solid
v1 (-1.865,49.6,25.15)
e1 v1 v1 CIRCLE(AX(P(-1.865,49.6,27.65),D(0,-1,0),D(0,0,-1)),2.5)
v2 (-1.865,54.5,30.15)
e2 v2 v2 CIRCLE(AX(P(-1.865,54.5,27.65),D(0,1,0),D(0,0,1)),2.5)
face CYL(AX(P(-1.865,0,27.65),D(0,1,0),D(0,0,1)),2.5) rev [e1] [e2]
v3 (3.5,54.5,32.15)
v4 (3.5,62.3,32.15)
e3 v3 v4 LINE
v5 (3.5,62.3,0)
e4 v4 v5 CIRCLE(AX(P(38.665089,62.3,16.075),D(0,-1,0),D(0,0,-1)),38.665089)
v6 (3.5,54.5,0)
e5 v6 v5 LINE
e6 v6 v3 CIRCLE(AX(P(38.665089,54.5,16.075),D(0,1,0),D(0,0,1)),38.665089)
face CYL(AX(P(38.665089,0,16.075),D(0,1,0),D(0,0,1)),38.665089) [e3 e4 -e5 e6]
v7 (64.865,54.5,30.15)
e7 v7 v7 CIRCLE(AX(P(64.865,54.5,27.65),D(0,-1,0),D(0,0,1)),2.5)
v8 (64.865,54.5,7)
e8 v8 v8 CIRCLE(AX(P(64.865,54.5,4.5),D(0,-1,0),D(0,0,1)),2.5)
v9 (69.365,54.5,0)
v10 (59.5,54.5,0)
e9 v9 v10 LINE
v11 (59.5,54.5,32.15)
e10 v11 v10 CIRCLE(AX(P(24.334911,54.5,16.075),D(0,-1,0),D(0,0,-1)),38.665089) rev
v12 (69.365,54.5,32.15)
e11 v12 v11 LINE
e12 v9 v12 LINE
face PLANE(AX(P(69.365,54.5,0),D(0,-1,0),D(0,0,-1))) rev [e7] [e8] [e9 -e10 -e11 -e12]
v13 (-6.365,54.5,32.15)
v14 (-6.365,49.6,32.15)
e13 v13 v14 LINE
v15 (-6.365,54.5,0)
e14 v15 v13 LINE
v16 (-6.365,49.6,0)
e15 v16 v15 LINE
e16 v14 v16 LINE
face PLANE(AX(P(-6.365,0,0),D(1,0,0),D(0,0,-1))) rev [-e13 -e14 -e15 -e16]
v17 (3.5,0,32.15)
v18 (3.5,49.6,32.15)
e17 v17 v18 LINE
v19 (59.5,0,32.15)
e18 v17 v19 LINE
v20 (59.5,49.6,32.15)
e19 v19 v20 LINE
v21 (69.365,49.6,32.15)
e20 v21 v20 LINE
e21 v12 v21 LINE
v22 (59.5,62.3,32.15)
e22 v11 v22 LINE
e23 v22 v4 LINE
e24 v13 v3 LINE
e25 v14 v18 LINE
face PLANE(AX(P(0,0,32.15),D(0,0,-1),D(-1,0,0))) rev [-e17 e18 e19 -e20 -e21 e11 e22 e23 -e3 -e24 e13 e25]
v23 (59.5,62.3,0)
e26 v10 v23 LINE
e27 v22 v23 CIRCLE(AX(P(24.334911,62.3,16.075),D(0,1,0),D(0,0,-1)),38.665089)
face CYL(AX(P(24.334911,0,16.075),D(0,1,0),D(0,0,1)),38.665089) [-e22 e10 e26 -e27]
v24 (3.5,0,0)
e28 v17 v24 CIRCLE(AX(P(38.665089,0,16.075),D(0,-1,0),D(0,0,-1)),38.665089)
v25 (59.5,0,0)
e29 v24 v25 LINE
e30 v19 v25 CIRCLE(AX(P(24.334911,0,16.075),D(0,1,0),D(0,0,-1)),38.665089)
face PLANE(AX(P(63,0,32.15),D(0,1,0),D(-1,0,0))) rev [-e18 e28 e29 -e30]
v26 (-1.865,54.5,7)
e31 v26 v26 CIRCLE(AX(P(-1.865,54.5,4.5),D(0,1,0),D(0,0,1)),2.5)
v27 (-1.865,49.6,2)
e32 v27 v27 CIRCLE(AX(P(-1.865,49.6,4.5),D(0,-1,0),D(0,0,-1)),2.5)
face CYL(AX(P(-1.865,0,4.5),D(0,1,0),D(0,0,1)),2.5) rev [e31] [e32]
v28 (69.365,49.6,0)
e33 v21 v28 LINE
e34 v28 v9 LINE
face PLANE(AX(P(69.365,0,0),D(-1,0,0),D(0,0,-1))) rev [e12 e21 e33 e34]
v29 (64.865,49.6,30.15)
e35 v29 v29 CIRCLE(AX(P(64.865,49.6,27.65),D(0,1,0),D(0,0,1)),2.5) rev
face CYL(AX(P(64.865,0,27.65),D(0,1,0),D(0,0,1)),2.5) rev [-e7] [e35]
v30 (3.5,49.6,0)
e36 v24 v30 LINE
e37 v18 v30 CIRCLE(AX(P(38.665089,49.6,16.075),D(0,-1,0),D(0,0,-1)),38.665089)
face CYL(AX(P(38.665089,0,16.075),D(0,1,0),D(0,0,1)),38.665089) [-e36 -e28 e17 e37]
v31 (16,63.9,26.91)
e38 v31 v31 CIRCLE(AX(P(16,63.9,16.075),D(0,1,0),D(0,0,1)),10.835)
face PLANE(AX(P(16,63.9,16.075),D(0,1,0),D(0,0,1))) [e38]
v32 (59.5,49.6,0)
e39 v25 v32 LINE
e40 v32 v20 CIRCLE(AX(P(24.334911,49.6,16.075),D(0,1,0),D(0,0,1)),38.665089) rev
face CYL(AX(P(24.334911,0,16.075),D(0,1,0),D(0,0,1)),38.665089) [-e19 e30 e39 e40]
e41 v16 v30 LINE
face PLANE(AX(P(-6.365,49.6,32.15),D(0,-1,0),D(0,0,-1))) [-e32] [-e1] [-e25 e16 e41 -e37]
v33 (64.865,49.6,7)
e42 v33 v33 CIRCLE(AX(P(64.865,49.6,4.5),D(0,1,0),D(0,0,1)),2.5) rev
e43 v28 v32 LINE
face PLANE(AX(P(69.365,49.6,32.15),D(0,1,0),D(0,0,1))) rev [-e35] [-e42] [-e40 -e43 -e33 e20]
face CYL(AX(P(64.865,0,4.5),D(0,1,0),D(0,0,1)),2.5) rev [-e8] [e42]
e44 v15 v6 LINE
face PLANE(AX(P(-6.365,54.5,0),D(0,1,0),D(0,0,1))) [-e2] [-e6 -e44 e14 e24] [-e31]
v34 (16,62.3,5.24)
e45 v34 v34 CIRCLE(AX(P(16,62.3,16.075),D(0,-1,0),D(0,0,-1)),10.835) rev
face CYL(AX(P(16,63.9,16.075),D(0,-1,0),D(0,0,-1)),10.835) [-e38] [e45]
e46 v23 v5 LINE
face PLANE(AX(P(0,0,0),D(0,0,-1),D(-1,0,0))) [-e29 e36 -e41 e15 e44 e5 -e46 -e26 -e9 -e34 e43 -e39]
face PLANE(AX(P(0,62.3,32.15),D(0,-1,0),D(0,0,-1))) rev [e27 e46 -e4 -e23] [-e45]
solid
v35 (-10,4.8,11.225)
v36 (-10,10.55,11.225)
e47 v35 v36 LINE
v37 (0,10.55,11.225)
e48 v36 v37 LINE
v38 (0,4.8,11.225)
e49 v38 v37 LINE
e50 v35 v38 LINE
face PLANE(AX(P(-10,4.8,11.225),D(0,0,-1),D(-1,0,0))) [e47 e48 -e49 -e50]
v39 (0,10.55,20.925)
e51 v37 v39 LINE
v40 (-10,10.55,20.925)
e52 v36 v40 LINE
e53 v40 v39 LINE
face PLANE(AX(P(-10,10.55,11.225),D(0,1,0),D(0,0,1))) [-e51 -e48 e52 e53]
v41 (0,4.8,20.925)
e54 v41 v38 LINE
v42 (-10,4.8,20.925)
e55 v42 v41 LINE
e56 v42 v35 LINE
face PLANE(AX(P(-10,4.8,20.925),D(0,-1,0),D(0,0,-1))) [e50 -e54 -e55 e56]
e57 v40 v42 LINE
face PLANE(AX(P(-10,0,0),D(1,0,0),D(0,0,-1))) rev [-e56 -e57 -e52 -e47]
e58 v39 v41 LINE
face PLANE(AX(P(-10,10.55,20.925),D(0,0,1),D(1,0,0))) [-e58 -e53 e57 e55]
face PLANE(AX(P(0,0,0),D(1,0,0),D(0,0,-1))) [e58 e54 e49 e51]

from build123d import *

# Parameters (mm, degrees)
SKETCH1_W           = 63
SKETCH1_H           = 62.3
BOSS_EXTRUDE1_DEPTH = 32.15
SKETCH4_R           = 10.835
BOSS_EXTRUDE3_DEPTH = 1.6
CUT_EXTRUDE1_DEPTH  = 95.254509176
BOSS_EXTRUDE4_START = -6.365
SKETCH3_W           = 32.15
SKETCH3_H           = 4.9
BOSS_EXTRUDE4_DEPTH = 16.365
SKETCH6_R           = 2.5
CUT_EXTRUDE2_DEPTH  = 90.29094299
MIRROR2_DEPTH       = 49.6
MIRROR2_START       = 54.5
MIRROR2_2_DEPTH     = 7.8
MIRROR2_START_2     = 49.6
MIRROR2_3_DEPTH     = 4.9
MIRROR2_4_DEPTH     = 4.9
SKETCH5_W           = 9.7
SKETCH5_H           = 5.75
BOSS_EXTRUDE5_DEPTH = 10


# Read off the part's stored shape, not the designer's step: Mirror2
with BuildPart() as part:
    # Sketch1 → Boss-Extrude1 (new body)
    with BuildSketch(Plane.XY):
        with Locations((31.5, 31.15)):
            Rectangle(SKETCH1_W, SKETCH1_H)
    extrude(amount=BOSS_EXTRUDE1_DEPTH)

    # Sketch4 → Boss-Extrude3 (add)
    with BuildSketch(Plane(origin=(0, 62.3, 0), x_dir=(1, 0, 0), z_dir=(0, 1, 0))):
        with Locations(Location((16, -16.075, 0), (0, 0, 90))):
            Circle(SKETCH4_R)
    extrude(amount=BOSS_EXTRUDE3_DEPTH)

    # Sketch7 → Cut-Extrude1 (cut, through all)
    with BuildSketch(Plane(origin=(0, 62.3, 0), x_dir=(1, 0, 0), z_dir=(0, 1, 0))):
        with BuildLine():
            Line((3.5, 0), (0, 0))
            Line((0, 0), (0, -16.075))
            ThreePointArc((0, -16.075), (0.885131329, -7.849192669), (3.5, 0))
        make_face()
    cut_extrude1 = extrude(amount=-CUT_EXTRUDE1_DEPTH, mode=Mode.SUBTRACT)

    # Mirror1: Cut-Extrude1 across plane
    add(cut_extrude1.mirror(Plane.XY.offset(16.075)), mode=Mode.SUBTRACT)

    # Sketch3 → Boss-Extrude4 (add)
    with BuildSketch(Plane(origin=(0, 0, 0), x_dir=(0, 0, -1), z_dir=(1, 0, 0)).offset(BOSS_EXTRUDE4_START)):
        with Locations((-16.075, 52.05)):
            Rectangle(SKETCH3_W, SKETCH3_H)
    extrude(amount=BOSS_EXTRUDE4_DEPTH)

    # Sketch6 → Cut-Extrude2 (cut, through all)
    with BuildSketch(Plane(origin=(0, 54.5, 0), x_dir=(1, 0, 0), z_dir=(0, 1, 0))):
        with Locations(Location((-1.865, -4.5, 0), (0, 0, 270))):
            Circle(SKETCH6_R)
        with Locations(Location((-1.865, -27.65, 0), (0, 0, 270))):
            Circle(SKETCH6_R)
    extrude(amount=-CUT_EXTRUDE2_DEPTH, mode=Mode.SUBTRACT)

    # Mirror2 outline → Mirror2 (cut)
    with BuildSketch(Plane(origin=(0, 0, 0), x_dir=(1, 0, 0), z_dir=(0, 1, 0))):
        with BuildLine():
            ThreePointArc((63, -16.075), (62.114868671, -24.300807331), (59.5, -32.15))
            Line((59.5, -32.15), (63, -32.15))
            Line((63, -32.15), (63, -16.075))
        make_face()
        with BuildLine():
            ThreePointArc((59.5, 0), (62.114868671, -7.849192669), (63, -16.075))
            Line((63, -16.075), (63, 0))
            Line((63, 0), (59.5, 0))
        make_face()
    extrude(amount=MIRROR2_DEPTH, mode=Mode.SUBTRACT)

    # Mirror2 2 outline → Mirror2 2 (cut)
    with BuildSketch(Plane(origin=(0, 0, 0), x_dir=(1, 0, 0), z_dir=(0, 1, 0)).offset(MIRROR2_START)):
        with BuildLine():
            ThreePointArc((63, -16.075), (62.114868671, -24.300807331), (59.5, -32.15))
            Line((59.5, -32.15), (63, -32.15))
            Line((63, -32.15), (63, -16.075))
        make_face()
        with BuildLine():
            ThreePointArc((59.5, 0), (62.114868671, -7.849192669), (63, -16.075))
            Line((63, -16.075), (63, 0))
            Line((63, 0), (59.5, 0))
        make_face()
    extrude(amount=MIRROR2_2_DEPTH, mode=Mode.SUBTRACT)

    # Mirror2 3 outline → Mirror2 3 (cut)
    with BuildSketch(Plane(origin=(0, 0, 0), x_dir=(1, 0, 0), z_dir=(0, 1, 0)).offset(MIRROR2_START_2)):
        with BuildLine():
            ThreePointArc((63, -2.835135141), (62.365, -4.5), (63, -6.164864859))
            Line((63, -6.164864859), (63, -2.835135141))
        make_face()
        with BuildLine():
            Line((63, -29.314864859), (63, -25.985135141))
            ThreePointArc((63, -25.985135141), (62.365, -27.65), (63, -29.314864859))
        make_face()
    extrude(amount=MIRROR2_3_DEPTH, mode=Mode.SUBTRACT)

    # Mirror2 4 outline → Mirror2 4 (add)
    with BuildSketch(Plane(origin=(0, 0, 0), x_dir=(1, 0, 0), z_dir=(0, 1, 0)).offset(MIRROR2_START_2)):
        with BuildLine():
            Line((63, -6.164864859), (63, -25.985135141))
            ThreePointArc((63, -25.985135141), (67.365, -27.65), (63, -29.314864859))
            Line((63, -29.314864859), (63, -32.15))
            Line((63, -32.15), (69.365, -32.15))
            Line((69.365, -32.15), (69.365, 0))
            Line((69.365, 0), (63, 0))
            Line((63, 0), (63, -2.835135141))
            ThreePointArc((63, -2.835135141), (67.365, -4.5), (63, -6.164864859))
        make_face()
    extrude(amount=MIRROR2_4_DEPTH)


with BuildPart() as body_2:
    # Sketch5 → Boss-Extrude5 (new body)
    with BuildSketch(Plane(origin=(0, 0, 0), x_dir=(0, 0, -1), z_dir=(1, 0, 0))):
        with Locations((-16.075, 7.675)):
            Rectangle(SKETCH5_W, SKETCH5_H)
    extrude(amount=-BOSS_EXTRUDE5_DEPTH)


solid = Compound([part.part, body_2.part])
